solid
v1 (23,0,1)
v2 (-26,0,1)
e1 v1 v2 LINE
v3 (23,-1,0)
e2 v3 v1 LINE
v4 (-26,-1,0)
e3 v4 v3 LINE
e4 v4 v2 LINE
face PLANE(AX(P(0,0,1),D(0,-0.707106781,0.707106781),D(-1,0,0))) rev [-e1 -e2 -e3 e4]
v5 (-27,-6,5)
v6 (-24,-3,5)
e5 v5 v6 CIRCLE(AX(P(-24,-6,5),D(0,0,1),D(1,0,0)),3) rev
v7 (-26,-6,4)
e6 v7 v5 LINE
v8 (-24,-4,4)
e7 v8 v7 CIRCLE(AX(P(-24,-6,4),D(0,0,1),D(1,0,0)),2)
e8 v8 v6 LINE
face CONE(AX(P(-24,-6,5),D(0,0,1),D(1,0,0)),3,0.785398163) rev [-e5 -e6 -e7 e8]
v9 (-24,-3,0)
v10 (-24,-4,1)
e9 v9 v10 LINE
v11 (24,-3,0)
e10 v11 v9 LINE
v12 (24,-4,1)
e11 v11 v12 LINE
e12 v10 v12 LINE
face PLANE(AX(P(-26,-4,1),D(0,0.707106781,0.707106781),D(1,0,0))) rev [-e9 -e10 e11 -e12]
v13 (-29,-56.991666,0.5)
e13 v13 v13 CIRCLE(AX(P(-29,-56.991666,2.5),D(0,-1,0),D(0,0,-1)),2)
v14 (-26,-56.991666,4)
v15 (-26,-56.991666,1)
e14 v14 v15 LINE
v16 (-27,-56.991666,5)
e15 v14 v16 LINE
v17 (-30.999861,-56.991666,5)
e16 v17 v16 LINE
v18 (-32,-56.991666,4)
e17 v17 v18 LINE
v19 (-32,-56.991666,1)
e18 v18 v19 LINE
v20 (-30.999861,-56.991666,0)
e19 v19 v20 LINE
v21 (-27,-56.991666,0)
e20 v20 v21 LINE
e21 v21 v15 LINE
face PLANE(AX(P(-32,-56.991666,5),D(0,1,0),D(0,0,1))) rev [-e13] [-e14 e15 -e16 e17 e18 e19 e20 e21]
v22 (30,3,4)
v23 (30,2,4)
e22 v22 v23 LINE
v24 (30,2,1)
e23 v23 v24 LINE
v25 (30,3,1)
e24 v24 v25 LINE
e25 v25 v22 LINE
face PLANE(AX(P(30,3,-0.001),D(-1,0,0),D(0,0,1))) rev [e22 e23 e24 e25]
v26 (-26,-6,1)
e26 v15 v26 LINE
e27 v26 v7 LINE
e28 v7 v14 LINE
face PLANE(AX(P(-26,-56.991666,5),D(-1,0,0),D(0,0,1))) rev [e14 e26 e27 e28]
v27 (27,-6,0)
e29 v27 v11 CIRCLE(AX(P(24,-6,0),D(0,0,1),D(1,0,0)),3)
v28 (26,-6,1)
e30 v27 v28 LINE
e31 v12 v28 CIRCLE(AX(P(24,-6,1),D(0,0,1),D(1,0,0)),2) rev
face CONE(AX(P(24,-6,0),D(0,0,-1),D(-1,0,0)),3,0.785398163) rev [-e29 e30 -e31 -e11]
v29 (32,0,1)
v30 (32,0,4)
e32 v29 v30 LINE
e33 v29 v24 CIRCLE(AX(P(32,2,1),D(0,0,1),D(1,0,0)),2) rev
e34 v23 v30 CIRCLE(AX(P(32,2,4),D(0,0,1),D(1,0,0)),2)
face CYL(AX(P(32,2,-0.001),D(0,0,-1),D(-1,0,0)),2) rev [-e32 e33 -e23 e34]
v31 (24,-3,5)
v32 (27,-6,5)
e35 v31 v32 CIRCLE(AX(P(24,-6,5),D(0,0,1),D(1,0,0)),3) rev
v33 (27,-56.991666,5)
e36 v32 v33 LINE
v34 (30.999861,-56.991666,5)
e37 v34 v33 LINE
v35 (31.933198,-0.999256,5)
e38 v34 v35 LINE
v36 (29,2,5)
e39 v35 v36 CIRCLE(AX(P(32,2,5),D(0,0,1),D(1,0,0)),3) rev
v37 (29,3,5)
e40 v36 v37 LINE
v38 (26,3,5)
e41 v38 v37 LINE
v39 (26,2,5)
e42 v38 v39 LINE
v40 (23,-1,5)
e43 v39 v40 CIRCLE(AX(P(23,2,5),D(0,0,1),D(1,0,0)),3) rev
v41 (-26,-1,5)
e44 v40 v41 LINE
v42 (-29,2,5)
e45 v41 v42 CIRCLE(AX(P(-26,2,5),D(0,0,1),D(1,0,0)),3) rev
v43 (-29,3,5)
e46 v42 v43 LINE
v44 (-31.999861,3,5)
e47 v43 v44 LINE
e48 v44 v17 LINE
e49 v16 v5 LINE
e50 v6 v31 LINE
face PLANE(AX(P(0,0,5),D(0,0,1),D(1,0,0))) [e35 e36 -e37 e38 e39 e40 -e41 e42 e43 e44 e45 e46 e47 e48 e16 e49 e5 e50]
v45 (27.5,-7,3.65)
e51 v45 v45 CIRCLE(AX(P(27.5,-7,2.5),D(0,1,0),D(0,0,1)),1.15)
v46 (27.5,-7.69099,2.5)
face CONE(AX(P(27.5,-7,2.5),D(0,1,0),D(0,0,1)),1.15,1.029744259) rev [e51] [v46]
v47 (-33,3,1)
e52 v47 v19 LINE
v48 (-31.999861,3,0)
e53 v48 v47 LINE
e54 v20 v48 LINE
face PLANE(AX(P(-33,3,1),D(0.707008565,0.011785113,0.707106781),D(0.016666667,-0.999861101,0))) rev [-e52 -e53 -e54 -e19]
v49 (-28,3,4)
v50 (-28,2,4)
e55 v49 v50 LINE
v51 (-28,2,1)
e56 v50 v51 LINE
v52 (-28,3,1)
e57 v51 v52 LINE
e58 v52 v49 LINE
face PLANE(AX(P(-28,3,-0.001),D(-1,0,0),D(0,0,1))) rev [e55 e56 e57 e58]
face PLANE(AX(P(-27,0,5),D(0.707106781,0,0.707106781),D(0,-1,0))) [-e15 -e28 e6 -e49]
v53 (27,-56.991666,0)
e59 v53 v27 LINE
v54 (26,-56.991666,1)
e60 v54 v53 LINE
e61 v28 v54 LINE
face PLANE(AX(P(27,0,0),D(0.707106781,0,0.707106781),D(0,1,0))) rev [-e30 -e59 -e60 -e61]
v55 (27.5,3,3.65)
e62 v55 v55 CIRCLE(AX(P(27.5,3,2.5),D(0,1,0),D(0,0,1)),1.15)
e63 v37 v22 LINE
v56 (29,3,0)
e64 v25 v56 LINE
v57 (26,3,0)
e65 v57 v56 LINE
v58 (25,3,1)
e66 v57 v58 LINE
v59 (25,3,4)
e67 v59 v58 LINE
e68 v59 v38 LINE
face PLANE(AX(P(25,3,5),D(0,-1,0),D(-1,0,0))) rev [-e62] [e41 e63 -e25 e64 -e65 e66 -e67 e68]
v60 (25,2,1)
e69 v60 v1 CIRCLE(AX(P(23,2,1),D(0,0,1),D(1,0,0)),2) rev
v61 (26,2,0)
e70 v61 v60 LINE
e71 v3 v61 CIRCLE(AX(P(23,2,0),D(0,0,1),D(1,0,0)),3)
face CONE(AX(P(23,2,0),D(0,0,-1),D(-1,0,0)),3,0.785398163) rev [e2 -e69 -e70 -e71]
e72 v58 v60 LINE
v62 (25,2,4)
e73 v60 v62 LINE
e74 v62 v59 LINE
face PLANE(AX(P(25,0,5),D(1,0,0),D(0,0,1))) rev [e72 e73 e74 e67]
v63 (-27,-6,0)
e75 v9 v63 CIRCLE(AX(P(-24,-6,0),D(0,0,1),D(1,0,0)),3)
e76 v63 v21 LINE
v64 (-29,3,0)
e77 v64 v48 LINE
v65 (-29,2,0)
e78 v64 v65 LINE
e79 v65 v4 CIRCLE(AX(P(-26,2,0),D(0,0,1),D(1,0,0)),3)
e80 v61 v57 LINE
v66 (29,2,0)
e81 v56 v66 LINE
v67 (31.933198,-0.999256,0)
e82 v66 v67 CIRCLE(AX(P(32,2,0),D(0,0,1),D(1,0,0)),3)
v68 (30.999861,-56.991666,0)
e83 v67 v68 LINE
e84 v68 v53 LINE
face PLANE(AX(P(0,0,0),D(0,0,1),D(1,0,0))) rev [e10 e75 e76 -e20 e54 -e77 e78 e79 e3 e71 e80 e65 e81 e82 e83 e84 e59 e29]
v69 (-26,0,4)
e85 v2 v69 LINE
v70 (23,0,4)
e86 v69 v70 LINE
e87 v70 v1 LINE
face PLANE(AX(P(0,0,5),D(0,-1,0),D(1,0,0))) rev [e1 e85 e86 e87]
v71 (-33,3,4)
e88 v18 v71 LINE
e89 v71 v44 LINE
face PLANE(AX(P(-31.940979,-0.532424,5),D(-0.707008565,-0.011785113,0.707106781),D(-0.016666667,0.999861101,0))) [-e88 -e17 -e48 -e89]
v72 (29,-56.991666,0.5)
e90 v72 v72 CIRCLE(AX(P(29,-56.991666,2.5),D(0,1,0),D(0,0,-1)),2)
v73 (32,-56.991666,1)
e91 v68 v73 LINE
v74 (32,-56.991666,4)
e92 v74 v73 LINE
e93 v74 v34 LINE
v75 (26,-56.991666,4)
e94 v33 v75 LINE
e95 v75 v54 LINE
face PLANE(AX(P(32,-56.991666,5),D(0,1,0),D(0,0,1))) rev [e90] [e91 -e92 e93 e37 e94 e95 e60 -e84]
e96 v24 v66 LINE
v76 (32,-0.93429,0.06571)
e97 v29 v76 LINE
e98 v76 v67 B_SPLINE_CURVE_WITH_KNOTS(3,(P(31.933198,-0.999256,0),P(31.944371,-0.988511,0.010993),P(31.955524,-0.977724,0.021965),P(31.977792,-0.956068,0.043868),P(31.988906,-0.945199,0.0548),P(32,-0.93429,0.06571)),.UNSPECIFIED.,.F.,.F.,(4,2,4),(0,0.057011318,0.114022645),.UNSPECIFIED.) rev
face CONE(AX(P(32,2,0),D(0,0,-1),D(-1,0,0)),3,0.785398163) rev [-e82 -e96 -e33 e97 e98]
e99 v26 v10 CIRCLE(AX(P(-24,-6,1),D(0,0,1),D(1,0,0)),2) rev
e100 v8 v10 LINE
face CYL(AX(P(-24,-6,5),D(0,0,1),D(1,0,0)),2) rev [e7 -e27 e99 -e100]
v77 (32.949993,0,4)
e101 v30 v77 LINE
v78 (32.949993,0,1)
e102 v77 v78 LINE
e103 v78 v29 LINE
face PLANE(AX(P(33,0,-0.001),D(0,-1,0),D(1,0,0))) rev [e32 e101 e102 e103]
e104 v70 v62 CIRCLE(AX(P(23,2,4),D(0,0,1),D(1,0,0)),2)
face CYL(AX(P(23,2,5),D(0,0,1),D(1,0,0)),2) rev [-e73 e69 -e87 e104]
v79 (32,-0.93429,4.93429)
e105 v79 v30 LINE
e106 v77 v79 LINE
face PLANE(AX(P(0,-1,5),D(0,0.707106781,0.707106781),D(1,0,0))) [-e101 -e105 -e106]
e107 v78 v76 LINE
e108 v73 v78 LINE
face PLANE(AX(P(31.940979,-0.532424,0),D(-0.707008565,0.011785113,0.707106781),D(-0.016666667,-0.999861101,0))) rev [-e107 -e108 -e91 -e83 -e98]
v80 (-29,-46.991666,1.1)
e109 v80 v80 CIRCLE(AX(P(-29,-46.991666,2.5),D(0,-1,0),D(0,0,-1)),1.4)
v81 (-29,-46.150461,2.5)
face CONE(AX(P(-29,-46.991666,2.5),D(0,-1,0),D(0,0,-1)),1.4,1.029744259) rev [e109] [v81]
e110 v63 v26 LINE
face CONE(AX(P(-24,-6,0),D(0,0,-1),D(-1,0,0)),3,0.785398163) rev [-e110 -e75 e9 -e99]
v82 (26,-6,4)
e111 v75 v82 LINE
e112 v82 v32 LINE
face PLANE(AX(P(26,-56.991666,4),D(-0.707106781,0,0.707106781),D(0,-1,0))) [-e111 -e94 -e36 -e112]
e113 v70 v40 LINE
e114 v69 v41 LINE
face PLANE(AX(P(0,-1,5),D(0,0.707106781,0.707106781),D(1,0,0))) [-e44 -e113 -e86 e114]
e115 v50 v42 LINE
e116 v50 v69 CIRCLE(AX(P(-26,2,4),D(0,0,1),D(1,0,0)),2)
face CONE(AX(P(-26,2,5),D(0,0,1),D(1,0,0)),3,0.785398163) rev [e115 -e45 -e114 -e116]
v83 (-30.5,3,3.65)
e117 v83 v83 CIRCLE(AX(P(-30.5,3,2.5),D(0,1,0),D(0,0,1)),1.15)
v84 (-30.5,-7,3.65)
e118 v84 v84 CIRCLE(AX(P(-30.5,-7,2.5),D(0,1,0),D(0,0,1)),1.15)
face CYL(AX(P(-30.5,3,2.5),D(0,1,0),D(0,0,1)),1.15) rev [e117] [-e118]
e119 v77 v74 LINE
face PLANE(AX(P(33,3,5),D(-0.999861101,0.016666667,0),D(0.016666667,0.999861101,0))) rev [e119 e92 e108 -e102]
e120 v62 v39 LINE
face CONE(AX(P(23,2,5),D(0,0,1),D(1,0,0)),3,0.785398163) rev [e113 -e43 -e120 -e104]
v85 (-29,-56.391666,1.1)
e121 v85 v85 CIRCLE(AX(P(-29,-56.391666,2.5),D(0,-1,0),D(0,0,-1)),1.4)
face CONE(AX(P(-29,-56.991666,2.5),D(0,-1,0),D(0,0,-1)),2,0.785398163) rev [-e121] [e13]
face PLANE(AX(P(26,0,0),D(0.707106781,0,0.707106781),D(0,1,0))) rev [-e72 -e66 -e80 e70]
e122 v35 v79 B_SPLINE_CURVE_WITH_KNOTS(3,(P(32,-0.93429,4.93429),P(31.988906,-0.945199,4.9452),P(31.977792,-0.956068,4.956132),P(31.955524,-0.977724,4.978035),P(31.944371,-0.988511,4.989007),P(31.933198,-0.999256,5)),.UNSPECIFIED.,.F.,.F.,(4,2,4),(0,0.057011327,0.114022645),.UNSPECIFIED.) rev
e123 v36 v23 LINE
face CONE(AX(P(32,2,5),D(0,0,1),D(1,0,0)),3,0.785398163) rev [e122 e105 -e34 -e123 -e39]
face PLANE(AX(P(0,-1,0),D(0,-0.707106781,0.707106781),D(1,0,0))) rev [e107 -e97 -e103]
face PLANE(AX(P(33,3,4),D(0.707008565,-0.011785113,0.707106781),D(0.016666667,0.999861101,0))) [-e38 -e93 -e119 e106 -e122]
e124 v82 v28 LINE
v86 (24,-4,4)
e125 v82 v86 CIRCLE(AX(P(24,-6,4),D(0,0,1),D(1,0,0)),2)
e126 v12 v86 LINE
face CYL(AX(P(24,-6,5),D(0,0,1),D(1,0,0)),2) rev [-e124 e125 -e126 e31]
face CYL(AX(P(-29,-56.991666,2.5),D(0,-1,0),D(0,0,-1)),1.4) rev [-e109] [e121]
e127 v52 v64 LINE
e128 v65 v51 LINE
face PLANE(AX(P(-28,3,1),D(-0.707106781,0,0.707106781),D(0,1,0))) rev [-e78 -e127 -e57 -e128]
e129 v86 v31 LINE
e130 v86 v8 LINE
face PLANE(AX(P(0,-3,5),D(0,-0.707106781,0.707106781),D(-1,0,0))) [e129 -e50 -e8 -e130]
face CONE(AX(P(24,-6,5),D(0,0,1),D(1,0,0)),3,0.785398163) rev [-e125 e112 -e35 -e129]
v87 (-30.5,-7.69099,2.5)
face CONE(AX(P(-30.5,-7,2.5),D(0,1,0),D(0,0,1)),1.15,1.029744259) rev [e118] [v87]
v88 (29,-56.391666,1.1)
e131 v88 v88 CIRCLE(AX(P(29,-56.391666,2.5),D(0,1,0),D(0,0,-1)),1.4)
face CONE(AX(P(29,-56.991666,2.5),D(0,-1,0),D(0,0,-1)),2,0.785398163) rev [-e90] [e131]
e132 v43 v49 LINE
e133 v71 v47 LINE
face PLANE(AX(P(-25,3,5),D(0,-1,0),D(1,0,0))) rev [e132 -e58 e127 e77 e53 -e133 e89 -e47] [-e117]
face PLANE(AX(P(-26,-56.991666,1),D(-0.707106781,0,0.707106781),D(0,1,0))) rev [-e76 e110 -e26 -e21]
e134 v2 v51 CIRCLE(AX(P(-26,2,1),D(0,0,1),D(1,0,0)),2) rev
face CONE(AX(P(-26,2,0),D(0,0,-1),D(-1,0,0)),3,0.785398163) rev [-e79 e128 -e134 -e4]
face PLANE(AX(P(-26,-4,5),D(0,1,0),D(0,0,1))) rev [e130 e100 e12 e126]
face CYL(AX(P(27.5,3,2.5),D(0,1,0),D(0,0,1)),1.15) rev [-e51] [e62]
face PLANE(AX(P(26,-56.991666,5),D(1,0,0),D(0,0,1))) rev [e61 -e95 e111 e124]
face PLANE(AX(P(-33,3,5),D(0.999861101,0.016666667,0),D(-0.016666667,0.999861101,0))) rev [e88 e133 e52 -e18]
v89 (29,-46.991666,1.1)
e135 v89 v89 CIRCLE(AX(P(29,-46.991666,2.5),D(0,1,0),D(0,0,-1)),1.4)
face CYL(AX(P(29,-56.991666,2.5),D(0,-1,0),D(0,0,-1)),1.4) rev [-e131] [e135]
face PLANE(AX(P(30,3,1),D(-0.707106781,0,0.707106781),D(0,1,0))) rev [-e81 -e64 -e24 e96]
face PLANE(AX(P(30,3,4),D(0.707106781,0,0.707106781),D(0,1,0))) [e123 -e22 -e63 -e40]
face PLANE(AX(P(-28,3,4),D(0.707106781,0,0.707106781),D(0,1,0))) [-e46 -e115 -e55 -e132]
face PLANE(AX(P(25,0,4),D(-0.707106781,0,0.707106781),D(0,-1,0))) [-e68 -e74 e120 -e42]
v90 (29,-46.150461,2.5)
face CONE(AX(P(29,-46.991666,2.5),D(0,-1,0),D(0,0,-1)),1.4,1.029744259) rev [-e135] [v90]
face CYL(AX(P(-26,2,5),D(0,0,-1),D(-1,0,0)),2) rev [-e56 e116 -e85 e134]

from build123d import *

# Parameters (mm, degrees)
BOSS_EXTRUDE1_DEPTH             = 5
F_3_0MM_DOWEL_HOLE1_D           = 2.8
F_3_0MM_DOWEL_HOLE1_DEPTH       = 10
F_3_0MM_DOWEL_HOLE1_CSINK_D     = 4
F_3_0MM_DOWEL_HOLE1_CSINK_ANGLE = 90
F_3_0MM_DOWEL_HOLE1_TIP         = 0.841204867
F_2_5MM_DOWEL_HOLE1_D           = 2.3
F_2_5MM_DOWEL_HOLE1_DEPTH       = 10
F_2_5MM_DOWEL_HOLE1_TIP         = 0.690989712
CUT_EXTRUDE1_REACH              = 68.046
SKETCH6_W                       = 3
SKETCH6_H                       = 3
FILLET2_R                       = 2
CHAMFER1_SIZE                   = 1


with BuildPart() as part:
    # Sketch1 → Boss-Extrude1 (new body)
    with BuildSketch(Plane.XY):
        Polygon((0, 0), (-25, 0), (-25, 3), (-33, 3), (-32, -56.991666088), (-26, -56.991666088), (-26, -4), (0, -4), align=None)
    extrude(amount=BOSS_EXTRUDE1_DEPTH)

    # Ø3.0mm Dowel Hole1
    with Locations(Plane(origin=(0, -56.991666088, 0), x_dir=(-1, 0, 0), z_dir=(0, -1, 0))):
        with Locations((29, -2.5)):
            CounterSinkHole(F_3_0MM_DOWEL_HOLE1_D / 2, F_3_0MM_DOWEL_HOLE1_CSINK_D / 2, depth=F_3_0MM_DOWEL_HOLE1_DEPTH, counter_sink_angle=F_3_0MM_DOWEL_HOLE1_CSINK_ANGLE)
            with Locations((0, 0, -(F_3_0MM_DOWEL_HOLE1_DEPTH + F_3_0MM_DOWEL_HOLE1_TIP / 2))):  # 118° drill point
                Cone(0, F_3_0MM_DOWEL_HOLE1_D / 2, F_3_0MM_DOWEL_HOLE1_TIP, mode=Mode.SUBTRACT)

    # Mirror1: part across plane


with BuildPart() as part_1:
    add(part.part)
    add(part.part.mirror(Plane(origin=(0, -4, 5), x_dir=(0, 0, 1), z_dir=(-1, 0, 0))))

    # Ø2.5mm Dowel Hole1
    with Locations(Plane(origin=(0, 3, 0), x_dir=(1, 0, 0), z_dir=(0, 1, 0))):
        with Locations((-30.5, -2.5), (27.5, -2.5)):
            Hole(F_2_5MM_DOWEL_HOLE1_D / 2, depth=F_2_5MM_DOWEL_HOLE1_DEPTH)
            with Locations((0, 0, -(F_2_5MM_DOWEL_HOLE1_DEPTH + F_2_5MM_DOWEL_HOLE1_TIP / 2))):  # 118° drill point
                Cone(0, F_2_5MM_DOWEL_HOLE1_D / 2, F_2_5MM_DOWEL_HOLE1_TIP, mode=Mode.SUBTRACT)

    # Sketch6 → Cut-Extrude1 (cut, up to next)
    with BuildSketch(Plane.XY.offset(5), mode=Mode.PRIVATE) as cut_extrude1_sk1:
        with Locations((-26.5, 1.5)):
            Rectangle(SKETCH6_W, SKETCH6_H)
    cut_extrude1_tool1 = extrude(cut_extrude1_sk1.sketch, amount=-CUT_EXTRUDE1_REACH, mode=Mode.PRIVATE) & part_1.part
    # Sketch6 → Cut-Extrude1 (cut, up to next)
    with BuildSketch(Plane.XY.offset(5), mode=Mode.PRIVATE) as cut_extrude1_sk2:
        with Locations((31.5, 1.5)):
            Rectangle(SKETCH6_W, SKETCH6_H)
    cut_extrude1_tool2 = extrude(cut_extrude1_sk2.sketch, amount=-CUT_EXTRUDE1_REACH, mode=Mode.PRIVATE) & part_1.part
    add(cut_extrude1_tool1.solids().sort_by_distance((-26.5, 1.5, 5))[0], mode=Mode.SUBTRACT)
    add(cut_extrude1_tool2.solids().sort_by_distance((31.5, 1.5, 5))[0], mode=Mode.SUBTRACT)

    # Fillet2
    fillet2_edges = [part_1.edges().sort_by_distance(p)[0] for p in [
        (-26, -4, 2.5),
        (25, 0, 2.5),
        (26, -4, 2.5),
        (-28, 0, 2.5),
        (30, 0, 2.5),
    ]]
    fillet(fillet2_edges, radius=FILLET2_R)

    # Chamfer1
    # the kernel refuses this chamfer: 1 mm, written as the material it takes off along each edge
    with BuildSketch(Plane(origin=(32, 2, 5), x_dir=(0, -1, 0), z_dir=(1, 0, 0))) as chamfer1_piece_1:
        Polygon((2 + CHAMFER1_SIZE, 0), (2, CHAMFER1_SIZE), (2, 0), align=None)
    revolve(axis=Axis((32, 2, 5), (0, 0, -1)), revolution_arc=90, mode=Mode.SUBTRACT)
    with BuildSketch(Plane(origin=(32, 2, 0), x_dir=(0, -1, 0), z_dir=(1, 0, 0))) as chamfer1_piece_2:
        Polygon((2 + CHAMFER1_SIZE, 0), (2, -CHAMFER1_SIZE), (2, 0), align=None)
    revolve(axis=Axis((32, 2, 0), (0, 0, -1)), revolution_arc=90, mode=Mode.SUBTRACT)
    with BuildSketch(Plane(origin=(-26, 2, 5), x_dir=(0, -1, 0), z_dir=(1, 0, 0))) as chamfer1_piece_3:
        Polygon((2, CHAMFER1_SIZE), (2 + CHAMFER1_SIZE, 0), (2, 0), align=None)
    revolve(axis=Axis((-26, 2, 5), (0, 0, -1)), revolution_arc=90, mode=Mode.SUBTRACT)
    with BuildSketch(Plane(origin=(-26, 2, 0), x_dir=(0, -1, 0), z_dir=(1, 0, 0))) as chamfer1_piece_4:
        Polygon((2 + CHAMFER1_SIZE, 0), (2, -CHAMFER1_SIZE), (2, 0), align=None)
    revolve(axis=Axis((-26, 2, 0), (0, 0, -1)), revolution_arc=90, mode=Mode.SUBTRACT)
    with BuildSketch(Plane(origin=(24, -6, 0), x_dir=(0, 1, 0), z_dir=(-1, 0, 0))) as chamfer1_piece_5:
        Polygon((2 + CHAMFER1_SIZE, 0), (2, -CHAMFER1_SIZE), (2, 0), align=None)
    revolve(axis=Axis((24, -6, 0), (0, 0, -1)), revolution_arc=90, mode=Mode.SUBTRACT)
    with BuildSketch(Plane(origin=(24, -6, 5), x_dir=(0, 1, 0), z_dir=(-1, 0, 0))) as chamfer1_piece_6:
        Polygon((2 + CHAMFER1_SIZE, 0), (2, CHAMFER1_SIZE), (2, 0), align=None)
    revolve(axis=Axis((24, -6, 5), (0, 0, -1)), revolution_arc=90, mode=Mode.SUBTRACT)
    with BuildSketch(Plane(origin=(-24, -6, 0), x_dir=(-1, 0, 0), z_dir=(0, -1, 0))) as chamfer1_piece_7:
        Polygon((2 + CHAMFER1_SIZE, 0), (2, -CHAMFER1_SIZE), (2, 0), align=None)
    revolve(axis=Axis((-24, -6, 0), (0, 0, -1)), revolution_arc=90, mode=Mode.SUBTRACT)
    with BuildSketch(Plane(origin=(-24, -6, 5), x_dir=(-1, 0, 0), z_dir=(0, -1, 0))) as chamfer1_piece_8:
        Polygon((2 + CHAMFER1_SIZE, 0), (2, CHAMFER1_SIZE), (2, 0), align=None)
    revolve(axis=Axis((-24, -6, 5), (0, 0, -1)), revolution_arc=90, mode=Mode.SUBTRACT)
    with BuildSketch(Plane(origin=(23, 2, 0), x_dir=(0, -1, 0), z_dir=(-1, 0, 0))) as chamfer1_piece_9:
        Polygon((2 + CHAMFER1_SIZE, 0), (2, CHAMFER1_SIZE), (2, 0), align=None)
    revolve(axis=Axis((23, 2, 0), (0, 0, 1)), revolution_arc=90, mode=Mode.SUBTRACT)
    with BuildSketch(Plane(origin=(23, 2, 5), x_dir=(0, -1, 0), z_dir=(-1, 0, 0))) as chamfer1_piece_10:
        Polygon((2, -CHAMFER1_SIZE), (2 + CHAMFER1_SIZE, 0), (2, 0), align=None)
    revolve(axis=Axis((23, 2, 5), (0, 0, 1)), revolution_arc=90, mode=Mode.SUBTRACT)
    with BuildSketch(Plane(origin=(-33.042861383, 5.571325785, 5), x_dir=(0.9994830708911936, 0.016660365281854946, 0.027495876610586452), z_dir=(0.01666666666666667, -0.9998611014647096, 0))) as chamfer1_piece_11:
        Polygon((CHAMFER1_SIZE * 0.999621916911, -CHAMFER1_SIZE * 0.0274958766106), (-CHAMFER1_SIZE * 0.0274958766106, -CHAMFER1_SIZE * 0.999621916911), (0, 0), align=None)
    extrude(amount=65.143365976, mode=Mode.SUBTRACT)
    with BuildSketch(Plane(origin=(-26, -59.563349076, 5), x_dir=(-0.9996219169112968, 0, 0.02749587661058651), z_dir=(0, 1, 0)), Plane(origin=(26, -59.563349076, 0), x_dir=(0.9996219169112968, 0, -0.02749587661058634), z_dir=(0, 1, 0))) as chamfer1_piece_12:
        Polygon((CHAMFER1_SIZE * 0.999621916911, -CHAMFER1_SIZE * 0.0274958766106), (-CHAMFER1_SIZE * 0.0274958766106, -CHAMFER1_SIZE * 0.999621916911), (0, 0), align=None)
    extrude(amount=53.563349076, mode=Mode.SUBTRACT)
    with BuildSketch(Plane(origin=(26, -59.563349076, 5), x_dir=(0.9996219169112968, 0, 0.02749587661058651), z_dir=(0, 1, 0)), Plane(origin=(-26, -59.563349076, 0), x_dir=(-0.9996219169112968, 0, -0.02749587661058639), z_dir=(0, 1, 0))) as chamfer1_piece_13:
        Polygon((CHAMFER1_SIZE * 0.999621916911, CHAMFER1_SIZE * 0.0274958766106), (-CHAMFER1_SIZE * 0.0274958766106, CHAMFER1_SIZE * 0.999621916911), (0, 0), align=None)
    extrude(amount=53.563349076, mode=Mode.SUBTRACT)
    with BuildSketch(Plane(origin=(32.992854437, 2.571325785, 0), x_dir=(-0.9994830708911936, 0.016660365281854946, -0.02749587661058633), z_dir=(-0.01666666666666667, -0.9998611014647096, 0))) as chamfer1_piece_14:
        Polygon((CHAMFER1_SIZE * 0.999621916911, -CHAMFER1_SIZE * 0.0274958766106), (-CHAMFER1_SIZE * 0.0274958766106, -CHAMFER1_SIZE * 0.999621916911), (0, 0), align=None)
    extrude(amount=62.142949222, mode=Mode.SUBTRACT)
    with BuildSketch(Plane(origin=(32.992854437, 2.571325785, 5), x_dir=(-0.9994830708911936, 0.016660365281854946, 0.027495876610586452), z_dir=(-0.01666666666666667, -0.9998611014647096, 0))) as chamfer1_piece_15:
        Polygon((CHAMFER1_SIZE * 0.999621916911, CHAMFER1_SIZE * 0.0274958766106), (-CHAMFER1_SIZE * 0.0274958766106, CHAMFER1_SIZE * 0.999621916911), (0, 0), align=None)
    extrude(amount=62.142949222, mode=Mode.SUBTRACT)
    with BuildSketch(Plane(origin=(-28, 5.571682988, 5), x_dir=(-0.9996219169112968, 0, 0.02749587661058651), z_dir=(0, -1, 0)), Plane(origin=(30, 5.571682988, 5), x_dir=(-0.9996219169112968, 0, 0.02749587661058651), z_dir=(0, -1, 0)), Plane(origin=(30, 2, 0), x_dir=(-0.9996219169112968, 0, -0.02749587661058634), z_dir=(0, 1, 0)), Plane(origin=(-28, 2, 0), x_dir=(-0.9996219169112968, 0, -0.02749587661058639), z_dir=(0, 1, 0)), Plane(origin=(25, 2, 5), x_dir=(0.9996219169112968, 0, 0.027495876610586605), z_dir=(0, 1, 0))) as chamfer1_piece_16:
        Polygon((CHAMFER1_SIZE * 0.999621916911, CHAMFER1_SIZE * 0.0274958766106), (-CHAMFER1_SIZE * 0.0274958766106, CHAMFER1_SIZE * 0.999621916911), (0, 0), align=None)
    extrude(amount=3.571682988, mode=Mode.SUBTRACT)
    with BuildSketch(Plane(origin=(-33.042861383, 5.571325785, 0), x_dir=(0.9994830708911936, 0.016660365281854946, -0.02749587661058633), z_dir=(0.01666666666666667, -0.9998611014647096, 0))) as chamfer1_piece_17:
        Polygon((CHAMFER1_SIZE * 0.999621916911, CHAMFER1_SIZE * 0.0274958766106), (-CHAMFER1_SIZE * 0.0274958766106, CHAMFER1_SIZE * 0.999621916911), (0, 0), align=None)
    extrude(amount=65.143365976, mode=Mode.SUBTRACT)
    with BuildSketch(Plane(origin=(23, 0, 0), x_dir=(0, 0.02749587661059217, 0.9996219169112965), z_dir=(-1, 0, 0)), Plane(origin=(-26, 0, 5), x_dir=(0, 0.027495876610583284, -0.9996219169112968), z_dir=(1, 0, 0))) as chamfer1_piece_18:
        Polygon((CHAMFER1_SIZE * 0.999621916911, -CHAMFER1_SIZE * 0.0274958766106), (-CHAMFER1_SIZE * 0.0274958766106, -CHAMFER1_SIZE * 0.999621916911), (0, 0), align=None)
    extrude(amount=49, mode=Mode.SUBTRACT)
    with BuildSketch(Plane(origin=(24, -4, 0), x_dir=(0, 0.9996219169112968, -0.027495876610586365), z_dir=(-1, 0, 0)), Plane(origin=(-24, -4, 5), x_dir=(0, 0.9996219169112968, 0.027495876610586487), z_dir=(1, 0, 0))) as chamfer1_piece_19:
        Polygon((CHAMFER1_SIZE * 0.999621916911, -CHAMFER1_SIZE * 0.0274958766106), (-CHAMFER1_SIZE * 0.0274958766106, -CHAMFER1_SIZE * 0.999621916911), (0, 0), align=None)
    extrude(amount=48, mode=Mode.SUBTRACT)
    with BuildSketch(Plane(origin=(25, 2, 0), x_dir=(0.9996219169112968, 0, -0.02749587661058654), z_dir=(0, 1, 0))) as chamfer1_piece_20:
        Polygon((CHAMFER1_SIZE * 0.999621916911, -CHAMFER1_SIZE * 0.0274958766106), (-CHAMFER1_SIZE * 0.0274958766106, -CHAMFER1_SIZE * 0.999621916911), (0, 0), align=None)
    extrude(amount=3.571682988, mode=Mode.SUBTRACT)
    with BuildSketch(Plane(origin=(35.521676042, 0, 0), x_dir=(0, -0.9996219169112968, -0.027495876610586365), z_dir=(-1, 0, 0)), Plane(origin=(32, 0, 5), x_dir=(0, -0.9996219169112968, 0.027495876610586497), z_dir=(1, 0, 0))) as chamfer1_piece_21:
        Polygon((CHAMFER1_SIZE * 0.999621916911, CHAMFER1_SIZE * 0.0274958766106), (-CHAMFER1_SIZE * 0.0274958766106, CHAMFER1_SIZE * 0.999621916911), (0, 0), align=None)
    extrude(amount=3.521676042, mode=Mode.SUBTRACT)


solid = part_1.part
